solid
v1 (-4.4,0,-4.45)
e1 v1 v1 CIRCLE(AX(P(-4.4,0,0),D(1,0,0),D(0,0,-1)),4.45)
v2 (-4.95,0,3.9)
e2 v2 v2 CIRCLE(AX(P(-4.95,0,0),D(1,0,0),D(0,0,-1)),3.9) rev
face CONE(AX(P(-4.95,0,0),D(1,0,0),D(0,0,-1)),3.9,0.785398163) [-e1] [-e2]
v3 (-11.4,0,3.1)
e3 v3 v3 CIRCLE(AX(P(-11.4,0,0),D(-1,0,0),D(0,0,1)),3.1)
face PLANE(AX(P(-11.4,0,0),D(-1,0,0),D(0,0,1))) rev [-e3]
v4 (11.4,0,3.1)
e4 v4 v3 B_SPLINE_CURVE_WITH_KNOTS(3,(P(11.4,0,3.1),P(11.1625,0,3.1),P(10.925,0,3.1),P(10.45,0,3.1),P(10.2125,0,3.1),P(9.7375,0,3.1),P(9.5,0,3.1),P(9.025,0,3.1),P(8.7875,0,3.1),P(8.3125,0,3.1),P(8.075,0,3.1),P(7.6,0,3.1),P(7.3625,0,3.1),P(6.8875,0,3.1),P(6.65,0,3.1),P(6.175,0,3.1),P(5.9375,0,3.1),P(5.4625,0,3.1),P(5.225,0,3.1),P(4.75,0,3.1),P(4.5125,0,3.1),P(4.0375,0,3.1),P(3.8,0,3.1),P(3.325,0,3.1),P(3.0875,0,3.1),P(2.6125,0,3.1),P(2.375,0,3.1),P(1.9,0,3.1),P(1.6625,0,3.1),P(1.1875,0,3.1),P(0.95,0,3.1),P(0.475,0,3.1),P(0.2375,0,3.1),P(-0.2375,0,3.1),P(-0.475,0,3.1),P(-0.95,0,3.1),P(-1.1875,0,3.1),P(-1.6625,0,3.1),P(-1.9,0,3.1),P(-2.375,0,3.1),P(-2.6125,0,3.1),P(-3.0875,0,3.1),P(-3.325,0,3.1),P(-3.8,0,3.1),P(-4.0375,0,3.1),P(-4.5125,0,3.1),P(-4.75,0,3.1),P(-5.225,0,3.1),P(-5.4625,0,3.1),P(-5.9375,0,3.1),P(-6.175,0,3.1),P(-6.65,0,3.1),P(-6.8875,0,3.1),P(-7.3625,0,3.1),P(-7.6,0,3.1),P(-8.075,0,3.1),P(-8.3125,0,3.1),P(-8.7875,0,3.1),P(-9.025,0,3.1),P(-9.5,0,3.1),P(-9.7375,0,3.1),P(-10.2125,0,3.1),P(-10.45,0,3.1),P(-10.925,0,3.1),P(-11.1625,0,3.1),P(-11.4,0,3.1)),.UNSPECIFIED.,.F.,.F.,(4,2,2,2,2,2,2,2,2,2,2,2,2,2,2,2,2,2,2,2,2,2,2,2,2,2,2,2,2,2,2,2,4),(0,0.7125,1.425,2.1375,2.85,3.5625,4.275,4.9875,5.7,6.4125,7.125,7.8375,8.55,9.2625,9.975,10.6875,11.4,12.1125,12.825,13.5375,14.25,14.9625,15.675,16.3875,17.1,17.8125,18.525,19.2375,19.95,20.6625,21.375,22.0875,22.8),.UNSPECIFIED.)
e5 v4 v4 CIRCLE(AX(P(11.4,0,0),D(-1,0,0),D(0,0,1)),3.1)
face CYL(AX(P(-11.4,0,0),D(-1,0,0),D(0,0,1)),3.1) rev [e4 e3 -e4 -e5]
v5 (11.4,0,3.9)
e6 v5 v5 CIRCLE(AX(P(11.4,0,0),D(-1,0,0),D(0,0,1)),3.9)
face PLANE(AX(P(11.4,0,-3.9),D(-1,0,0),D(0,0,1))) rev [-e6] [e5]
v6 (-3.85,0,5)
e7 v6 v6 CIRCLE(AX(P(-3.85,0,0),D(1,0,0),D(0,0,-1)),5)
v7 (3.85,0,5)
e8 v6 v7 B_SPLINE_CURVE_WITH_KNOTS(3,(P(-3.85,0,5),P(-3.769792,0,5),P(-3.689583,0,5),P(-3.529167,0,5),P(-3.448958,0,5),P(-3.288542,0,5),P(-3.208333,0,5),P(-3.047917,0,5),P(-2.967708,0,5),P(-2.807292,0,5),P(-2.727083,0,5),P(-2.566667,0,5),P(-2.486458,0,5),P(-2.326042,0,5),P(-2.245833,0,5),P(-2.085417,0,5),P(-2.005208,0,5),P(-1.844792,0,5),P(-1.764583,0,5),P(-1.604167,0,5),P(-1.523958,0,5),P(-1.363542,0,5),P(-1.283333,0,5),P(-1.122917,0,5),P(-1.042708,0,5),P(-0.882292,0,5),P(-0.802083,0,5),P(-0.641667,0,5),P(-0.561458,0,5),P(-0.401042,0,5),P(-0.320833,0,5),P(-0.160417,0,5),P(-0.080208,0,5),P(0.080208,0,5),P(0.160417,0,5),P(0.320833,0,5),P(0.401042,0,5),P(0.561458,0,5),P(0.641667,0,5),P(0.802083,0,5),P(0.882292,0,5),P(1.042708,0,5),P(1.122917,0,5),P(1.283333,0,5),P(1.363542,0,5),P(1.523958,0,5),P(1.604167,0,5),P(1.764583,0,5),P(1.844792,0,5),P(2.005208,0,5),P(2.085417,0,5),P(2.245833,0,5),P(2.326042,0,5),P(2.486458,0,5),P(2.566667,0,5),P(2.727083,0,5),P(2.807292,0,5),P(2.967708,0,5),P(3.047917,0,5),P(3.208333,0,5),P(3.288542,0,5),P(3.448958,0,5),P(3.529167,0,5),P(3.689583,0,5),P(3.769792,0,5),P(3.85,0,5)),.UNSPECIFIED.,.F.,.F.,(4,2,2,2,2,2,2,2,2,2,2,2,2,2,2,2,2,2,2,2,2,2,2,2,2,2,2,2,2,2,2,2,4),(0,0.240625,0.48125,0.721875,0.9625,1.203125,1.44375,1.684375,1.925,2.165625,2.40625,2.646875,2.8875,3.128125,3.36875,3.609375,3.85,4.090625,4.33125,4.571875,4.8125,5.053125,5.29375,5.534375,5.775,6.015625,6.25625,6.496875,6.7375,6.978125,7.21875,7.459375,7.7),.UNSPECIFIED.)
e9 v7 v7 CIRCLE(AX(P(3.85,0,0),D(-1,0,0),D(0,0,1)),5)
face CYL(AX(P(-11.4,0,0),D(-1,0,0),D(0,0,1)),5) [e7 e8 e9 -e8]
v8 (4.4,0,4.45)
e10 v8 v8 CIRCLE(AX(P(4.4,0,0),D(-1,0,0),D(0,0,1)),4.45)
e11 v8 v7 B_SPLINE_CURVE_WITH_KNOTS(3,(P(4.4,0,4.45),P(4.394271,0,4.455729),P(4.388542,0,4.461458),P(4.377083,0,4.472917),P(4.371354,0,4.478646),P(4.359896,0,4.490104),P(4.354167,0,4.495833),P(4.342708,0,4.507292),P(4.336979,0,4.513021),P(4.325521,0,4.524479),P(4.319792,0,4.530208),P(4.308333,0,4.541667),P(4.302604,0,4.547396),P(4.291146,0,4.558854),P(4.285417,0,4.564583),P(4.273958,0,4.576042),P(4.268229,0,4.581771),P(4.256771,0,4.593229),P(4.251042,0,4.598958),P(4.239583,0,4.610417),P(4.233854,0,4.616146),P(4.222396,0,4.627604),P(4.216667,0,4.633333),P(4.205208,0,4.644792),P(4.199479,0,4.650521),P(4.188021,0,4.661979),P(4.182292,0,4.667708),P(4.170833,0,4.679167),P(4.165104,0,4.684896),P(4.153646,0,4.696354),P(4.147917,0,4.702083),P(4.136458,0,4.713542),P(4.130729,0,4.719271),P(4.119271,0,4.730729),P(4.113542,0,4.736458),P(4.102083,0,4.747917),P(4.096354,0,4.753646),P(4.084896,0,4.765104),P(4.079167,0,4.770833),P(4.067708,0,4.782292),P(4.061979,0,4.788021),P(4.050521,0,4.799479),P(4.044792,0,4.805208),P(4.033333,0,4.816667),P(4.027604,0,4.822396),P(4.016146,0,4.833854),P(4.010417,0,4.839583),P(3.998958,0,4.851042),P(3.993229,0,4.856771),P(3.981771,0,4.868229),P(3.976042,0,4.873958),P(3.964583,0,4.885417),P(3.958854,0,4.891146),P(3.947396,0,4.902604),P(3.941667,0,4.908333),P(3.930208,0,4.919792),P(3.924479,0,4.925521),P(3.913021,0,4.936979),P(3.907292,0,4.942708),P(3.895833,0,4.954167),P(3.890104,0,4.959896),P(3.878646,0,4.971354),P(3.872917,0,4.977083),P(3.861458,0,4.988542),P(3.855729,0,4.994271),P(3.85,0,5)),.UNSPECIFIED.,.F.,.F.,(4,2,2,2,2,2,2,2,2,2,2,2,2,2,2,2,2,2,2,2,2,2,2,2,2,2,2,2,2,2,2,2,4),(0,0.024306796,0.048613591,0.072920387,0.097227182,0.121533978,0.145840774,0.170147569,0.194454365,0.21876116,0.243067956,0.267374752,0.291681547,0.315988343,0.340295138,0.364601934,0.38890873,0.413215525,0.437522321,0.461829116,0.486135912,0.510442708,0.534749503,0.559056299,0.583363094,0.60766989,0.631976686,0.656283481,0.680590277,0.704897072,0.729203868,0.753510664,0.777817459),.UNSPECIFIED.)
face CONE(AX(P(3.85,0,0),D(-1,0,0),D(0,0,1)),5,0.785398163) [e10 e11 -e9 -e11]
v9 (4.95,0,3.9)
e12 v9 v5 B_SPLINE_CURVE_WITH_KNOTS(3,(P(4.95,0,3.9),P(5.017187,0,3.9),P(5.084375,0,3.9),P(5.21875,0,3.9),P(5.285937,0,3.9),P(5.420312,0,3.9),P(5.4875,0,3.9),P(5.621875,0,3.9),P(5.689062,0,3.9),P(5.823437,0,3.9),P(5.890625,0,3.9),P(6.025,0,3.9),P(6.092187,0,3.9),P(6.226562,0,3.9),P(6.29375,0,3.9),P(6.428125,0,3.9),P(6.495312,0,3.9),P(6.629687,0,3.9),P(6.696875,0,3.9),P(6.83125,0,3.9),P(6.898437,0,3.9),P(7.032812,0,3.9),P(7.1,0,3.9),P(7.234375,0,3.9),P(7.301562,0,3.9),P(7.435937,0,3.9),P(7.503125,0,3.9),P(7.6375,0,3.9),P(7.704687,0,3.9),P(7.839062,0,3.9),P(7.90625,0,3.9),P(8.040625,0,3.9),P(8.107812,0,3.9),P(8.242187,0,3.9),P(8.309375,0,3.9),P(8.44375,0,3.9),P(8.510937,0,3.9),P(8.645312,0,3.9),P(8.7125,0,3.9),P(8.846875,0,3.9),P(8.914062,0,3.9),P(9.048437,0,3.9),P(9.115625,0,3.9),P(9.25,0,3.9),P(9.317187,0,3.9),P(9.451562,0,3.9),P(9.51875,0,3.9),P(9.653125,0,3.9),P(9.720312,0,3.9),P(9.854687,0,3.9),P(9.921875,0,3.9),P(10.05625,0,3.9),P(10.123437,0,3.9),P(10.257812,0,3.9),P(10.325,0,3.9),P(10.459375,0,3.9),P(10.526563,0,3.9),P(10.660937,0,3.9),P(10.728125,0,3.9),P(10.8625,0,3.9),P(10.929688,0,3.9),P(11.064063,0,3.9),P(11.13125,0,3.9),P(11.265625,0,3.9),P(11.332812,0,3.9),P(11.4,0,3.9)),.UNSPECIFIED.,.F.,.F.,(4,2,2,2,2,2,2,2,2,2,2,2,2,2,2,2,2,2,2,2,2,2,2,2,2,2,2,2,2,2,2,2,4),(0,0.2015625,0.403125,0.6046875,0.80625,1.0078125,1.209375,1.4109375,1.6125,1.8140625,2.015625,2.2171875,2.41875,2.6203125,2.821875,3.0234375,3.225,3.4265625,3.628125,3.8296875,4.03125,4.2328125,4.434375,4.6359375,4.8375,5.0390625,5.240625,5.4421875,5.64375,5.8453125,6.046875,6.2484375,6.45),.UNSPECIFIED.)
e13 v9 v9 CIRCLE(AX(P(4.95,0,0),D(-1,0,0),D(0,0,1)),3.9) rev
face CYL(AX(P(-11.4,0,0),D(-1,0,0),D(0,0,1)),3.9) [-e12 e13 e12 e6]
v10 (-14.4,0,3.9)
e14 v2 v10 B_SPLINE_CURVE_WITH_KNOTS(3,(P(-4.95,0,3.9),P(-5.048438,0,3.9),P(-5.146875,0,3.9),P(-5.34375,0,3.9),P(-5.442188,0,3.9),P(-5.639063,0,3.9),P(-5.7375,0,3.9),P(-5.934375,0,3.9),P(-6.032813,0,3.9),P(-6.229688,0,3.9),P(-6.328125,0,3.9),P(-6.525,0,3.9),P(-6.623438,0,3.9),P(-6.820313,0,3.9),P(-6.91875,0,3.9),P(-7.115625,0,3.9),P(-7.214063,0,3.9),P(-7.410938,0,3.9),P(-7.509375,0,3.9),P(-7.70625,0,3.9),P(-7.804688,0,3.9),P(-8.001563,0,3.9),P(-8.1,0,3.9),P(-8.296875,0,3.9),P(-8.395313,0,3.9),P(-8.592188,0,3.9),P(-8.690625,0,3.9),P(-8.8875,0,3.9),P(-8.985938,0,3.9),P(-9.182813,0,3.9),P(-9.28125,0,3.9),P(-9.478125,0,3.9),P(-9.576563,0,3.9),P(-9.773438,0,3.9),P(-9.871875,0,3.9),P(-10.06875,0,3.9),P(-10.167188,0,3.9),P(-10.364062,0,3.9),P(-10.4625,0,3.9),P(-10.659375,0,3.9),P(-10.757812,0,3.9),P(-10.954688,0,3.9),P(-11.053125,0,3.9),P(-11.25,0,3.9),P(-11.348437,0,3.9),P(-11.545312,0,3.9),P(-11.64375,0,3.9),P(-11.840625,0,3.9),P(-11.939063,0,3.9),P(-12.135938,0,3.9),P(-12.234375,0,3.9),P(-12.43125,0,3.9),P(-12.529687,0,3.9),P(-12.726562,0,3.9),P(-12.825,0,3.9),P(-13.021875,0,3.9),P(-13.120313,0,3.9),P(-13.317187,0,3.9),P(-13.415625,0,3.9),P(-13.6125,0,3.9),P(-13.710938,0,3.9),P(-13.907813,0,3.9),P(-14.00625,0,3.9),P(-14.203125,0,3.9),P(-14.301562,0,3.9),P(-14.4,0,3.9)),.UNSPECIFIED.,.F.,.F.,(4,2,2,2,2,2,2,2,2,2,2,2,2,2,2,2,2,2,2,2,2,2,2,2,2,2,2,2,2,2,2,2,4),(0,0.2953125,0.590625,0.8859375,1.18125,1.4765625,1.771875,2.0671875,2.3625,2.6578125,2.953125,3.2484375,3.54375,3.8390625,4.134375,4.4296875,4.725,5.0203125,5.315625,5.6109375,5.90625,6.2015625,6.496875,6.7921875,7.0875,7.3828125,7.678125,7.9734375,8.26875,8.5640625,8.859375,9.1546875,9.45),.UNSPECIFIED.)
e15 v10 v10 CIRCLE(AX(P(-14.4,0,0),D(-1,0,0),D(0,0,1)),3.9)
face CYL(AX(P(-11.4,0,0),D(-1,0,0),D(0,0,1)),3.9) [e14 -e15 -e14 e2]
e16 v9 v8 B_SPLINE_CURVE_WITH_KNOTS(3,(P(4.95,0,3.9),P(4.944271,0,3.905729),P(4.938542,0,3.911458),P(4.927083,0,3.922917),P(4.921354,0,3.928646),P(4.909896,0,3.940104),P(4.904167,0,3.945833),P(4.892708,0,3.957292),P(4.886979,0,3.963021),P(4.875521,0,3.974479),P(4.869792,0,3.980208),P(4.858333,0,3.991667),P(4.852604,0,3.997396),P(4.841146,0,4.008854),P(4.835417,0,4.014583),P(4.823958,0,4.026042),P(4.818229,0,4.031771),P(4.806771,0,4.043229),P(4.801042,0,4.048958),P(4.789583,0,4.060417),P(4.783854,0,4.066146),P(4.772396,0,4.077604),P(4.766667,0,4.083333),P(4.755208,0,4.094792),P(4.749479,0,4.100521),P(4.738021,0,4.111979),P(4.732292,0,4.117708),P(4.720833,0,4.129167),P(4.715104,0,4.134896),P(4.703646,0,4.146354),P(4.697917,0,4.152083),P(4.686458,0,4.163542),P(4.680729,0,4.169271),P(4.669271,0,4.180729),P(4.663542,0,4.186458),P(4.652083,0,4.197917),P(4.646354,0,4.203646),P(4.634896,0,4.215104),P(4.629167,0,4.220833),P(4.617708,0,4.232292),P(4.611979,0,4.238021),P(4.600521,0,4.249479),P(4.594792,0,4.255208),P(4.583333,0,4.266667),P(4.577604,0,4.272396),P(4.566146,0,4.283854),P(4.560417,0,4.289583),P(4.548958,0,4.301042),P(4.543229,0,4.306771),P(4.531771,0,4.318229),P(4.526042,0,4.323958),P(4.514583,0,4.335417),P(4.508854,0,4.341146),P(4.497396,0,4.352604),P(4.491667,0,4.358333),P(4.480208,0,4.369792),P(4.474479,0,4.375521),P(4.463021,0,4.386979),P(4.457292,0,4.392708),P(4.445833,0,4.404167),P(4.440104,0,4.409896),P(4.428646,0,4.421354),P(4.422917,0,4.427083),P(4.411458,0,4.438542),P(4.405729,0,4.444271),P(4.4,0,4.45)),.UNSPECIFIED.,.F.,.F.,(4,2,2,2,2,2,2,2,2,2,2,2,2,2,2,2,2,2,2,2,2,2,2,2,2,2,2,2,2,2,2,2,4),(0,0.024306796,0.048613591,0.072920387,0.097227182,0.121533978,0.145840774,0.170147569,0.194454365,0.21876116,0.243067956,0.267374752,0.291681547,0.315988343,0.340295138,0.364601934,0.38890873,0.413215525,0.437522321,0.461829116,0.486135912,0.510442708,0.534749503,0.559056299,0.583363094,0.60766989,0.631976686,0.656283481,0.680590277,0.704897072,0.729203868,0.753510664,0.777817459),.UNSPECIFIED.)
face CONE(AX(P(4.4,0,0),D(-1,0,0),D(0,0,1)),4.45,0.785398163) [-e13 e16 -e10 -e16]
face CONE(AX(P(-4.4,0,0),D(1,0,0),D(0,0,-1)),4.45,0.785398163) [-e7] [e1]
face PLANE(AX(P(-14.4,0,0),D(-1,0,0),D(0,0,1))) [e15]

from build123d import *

# Parameters (mm, degrees)
CHAMFER8_SIZE       = 0.55
BOSS_EXTRUDE3_START = 3
SKETCH8_R           = 3.9
BOSS_EXTRUDE3_DEPTH = 3


with BuildPart() as part:
    # Sketch1 → Revolve1 (revolve)
    with BuildSketch(Plane(origin=(0, 0, 0), x_dir=(1, 0, 0), z_dir=(0, 1, 0)), mode=Mode.PRIVATE) as revolve1_sk:
        Polygon((-11.4, 3.1), (11.4, 3.1), (11.4, 3.9), (4.4, 3.9), (4.4, 5), (-4.4, 5), (-4.4, 3.9), (-11.4, 3.9), align=None)
    revolve(revolve1_sk.sketch.rotate(Axis((-11.4, 0, 0), (1, 0, 0)), 180), axis=Axis((-11.4, 0, 0), (1, 0, 0)))

    # Chamfer8
    chamfer8_edges = [part.edges().sort_by_distance(p)[0] for p in [
        (4.4, 0, -3.9),
        (4.4, 0, -5),
        (-4.4, 0, -5),
        (-4.4, 0, -3.9),
    ]]
    chamfer(chamfer8_edges, length=CHAMFER8_SIZE - 0.0001)  # a hair under: the kernel refuses the full size

    # Sketch8 → Boss-Extrude3 (add)
    with BuildSketch(Plane.ZY.offset(11.4).offset(BOSS_EXTRUDE3_START)):
        Circle(SKETCH8_R)
    extrude(amount=-BOSS_EXTRUDE3_DEPTH)


solid = part.part
